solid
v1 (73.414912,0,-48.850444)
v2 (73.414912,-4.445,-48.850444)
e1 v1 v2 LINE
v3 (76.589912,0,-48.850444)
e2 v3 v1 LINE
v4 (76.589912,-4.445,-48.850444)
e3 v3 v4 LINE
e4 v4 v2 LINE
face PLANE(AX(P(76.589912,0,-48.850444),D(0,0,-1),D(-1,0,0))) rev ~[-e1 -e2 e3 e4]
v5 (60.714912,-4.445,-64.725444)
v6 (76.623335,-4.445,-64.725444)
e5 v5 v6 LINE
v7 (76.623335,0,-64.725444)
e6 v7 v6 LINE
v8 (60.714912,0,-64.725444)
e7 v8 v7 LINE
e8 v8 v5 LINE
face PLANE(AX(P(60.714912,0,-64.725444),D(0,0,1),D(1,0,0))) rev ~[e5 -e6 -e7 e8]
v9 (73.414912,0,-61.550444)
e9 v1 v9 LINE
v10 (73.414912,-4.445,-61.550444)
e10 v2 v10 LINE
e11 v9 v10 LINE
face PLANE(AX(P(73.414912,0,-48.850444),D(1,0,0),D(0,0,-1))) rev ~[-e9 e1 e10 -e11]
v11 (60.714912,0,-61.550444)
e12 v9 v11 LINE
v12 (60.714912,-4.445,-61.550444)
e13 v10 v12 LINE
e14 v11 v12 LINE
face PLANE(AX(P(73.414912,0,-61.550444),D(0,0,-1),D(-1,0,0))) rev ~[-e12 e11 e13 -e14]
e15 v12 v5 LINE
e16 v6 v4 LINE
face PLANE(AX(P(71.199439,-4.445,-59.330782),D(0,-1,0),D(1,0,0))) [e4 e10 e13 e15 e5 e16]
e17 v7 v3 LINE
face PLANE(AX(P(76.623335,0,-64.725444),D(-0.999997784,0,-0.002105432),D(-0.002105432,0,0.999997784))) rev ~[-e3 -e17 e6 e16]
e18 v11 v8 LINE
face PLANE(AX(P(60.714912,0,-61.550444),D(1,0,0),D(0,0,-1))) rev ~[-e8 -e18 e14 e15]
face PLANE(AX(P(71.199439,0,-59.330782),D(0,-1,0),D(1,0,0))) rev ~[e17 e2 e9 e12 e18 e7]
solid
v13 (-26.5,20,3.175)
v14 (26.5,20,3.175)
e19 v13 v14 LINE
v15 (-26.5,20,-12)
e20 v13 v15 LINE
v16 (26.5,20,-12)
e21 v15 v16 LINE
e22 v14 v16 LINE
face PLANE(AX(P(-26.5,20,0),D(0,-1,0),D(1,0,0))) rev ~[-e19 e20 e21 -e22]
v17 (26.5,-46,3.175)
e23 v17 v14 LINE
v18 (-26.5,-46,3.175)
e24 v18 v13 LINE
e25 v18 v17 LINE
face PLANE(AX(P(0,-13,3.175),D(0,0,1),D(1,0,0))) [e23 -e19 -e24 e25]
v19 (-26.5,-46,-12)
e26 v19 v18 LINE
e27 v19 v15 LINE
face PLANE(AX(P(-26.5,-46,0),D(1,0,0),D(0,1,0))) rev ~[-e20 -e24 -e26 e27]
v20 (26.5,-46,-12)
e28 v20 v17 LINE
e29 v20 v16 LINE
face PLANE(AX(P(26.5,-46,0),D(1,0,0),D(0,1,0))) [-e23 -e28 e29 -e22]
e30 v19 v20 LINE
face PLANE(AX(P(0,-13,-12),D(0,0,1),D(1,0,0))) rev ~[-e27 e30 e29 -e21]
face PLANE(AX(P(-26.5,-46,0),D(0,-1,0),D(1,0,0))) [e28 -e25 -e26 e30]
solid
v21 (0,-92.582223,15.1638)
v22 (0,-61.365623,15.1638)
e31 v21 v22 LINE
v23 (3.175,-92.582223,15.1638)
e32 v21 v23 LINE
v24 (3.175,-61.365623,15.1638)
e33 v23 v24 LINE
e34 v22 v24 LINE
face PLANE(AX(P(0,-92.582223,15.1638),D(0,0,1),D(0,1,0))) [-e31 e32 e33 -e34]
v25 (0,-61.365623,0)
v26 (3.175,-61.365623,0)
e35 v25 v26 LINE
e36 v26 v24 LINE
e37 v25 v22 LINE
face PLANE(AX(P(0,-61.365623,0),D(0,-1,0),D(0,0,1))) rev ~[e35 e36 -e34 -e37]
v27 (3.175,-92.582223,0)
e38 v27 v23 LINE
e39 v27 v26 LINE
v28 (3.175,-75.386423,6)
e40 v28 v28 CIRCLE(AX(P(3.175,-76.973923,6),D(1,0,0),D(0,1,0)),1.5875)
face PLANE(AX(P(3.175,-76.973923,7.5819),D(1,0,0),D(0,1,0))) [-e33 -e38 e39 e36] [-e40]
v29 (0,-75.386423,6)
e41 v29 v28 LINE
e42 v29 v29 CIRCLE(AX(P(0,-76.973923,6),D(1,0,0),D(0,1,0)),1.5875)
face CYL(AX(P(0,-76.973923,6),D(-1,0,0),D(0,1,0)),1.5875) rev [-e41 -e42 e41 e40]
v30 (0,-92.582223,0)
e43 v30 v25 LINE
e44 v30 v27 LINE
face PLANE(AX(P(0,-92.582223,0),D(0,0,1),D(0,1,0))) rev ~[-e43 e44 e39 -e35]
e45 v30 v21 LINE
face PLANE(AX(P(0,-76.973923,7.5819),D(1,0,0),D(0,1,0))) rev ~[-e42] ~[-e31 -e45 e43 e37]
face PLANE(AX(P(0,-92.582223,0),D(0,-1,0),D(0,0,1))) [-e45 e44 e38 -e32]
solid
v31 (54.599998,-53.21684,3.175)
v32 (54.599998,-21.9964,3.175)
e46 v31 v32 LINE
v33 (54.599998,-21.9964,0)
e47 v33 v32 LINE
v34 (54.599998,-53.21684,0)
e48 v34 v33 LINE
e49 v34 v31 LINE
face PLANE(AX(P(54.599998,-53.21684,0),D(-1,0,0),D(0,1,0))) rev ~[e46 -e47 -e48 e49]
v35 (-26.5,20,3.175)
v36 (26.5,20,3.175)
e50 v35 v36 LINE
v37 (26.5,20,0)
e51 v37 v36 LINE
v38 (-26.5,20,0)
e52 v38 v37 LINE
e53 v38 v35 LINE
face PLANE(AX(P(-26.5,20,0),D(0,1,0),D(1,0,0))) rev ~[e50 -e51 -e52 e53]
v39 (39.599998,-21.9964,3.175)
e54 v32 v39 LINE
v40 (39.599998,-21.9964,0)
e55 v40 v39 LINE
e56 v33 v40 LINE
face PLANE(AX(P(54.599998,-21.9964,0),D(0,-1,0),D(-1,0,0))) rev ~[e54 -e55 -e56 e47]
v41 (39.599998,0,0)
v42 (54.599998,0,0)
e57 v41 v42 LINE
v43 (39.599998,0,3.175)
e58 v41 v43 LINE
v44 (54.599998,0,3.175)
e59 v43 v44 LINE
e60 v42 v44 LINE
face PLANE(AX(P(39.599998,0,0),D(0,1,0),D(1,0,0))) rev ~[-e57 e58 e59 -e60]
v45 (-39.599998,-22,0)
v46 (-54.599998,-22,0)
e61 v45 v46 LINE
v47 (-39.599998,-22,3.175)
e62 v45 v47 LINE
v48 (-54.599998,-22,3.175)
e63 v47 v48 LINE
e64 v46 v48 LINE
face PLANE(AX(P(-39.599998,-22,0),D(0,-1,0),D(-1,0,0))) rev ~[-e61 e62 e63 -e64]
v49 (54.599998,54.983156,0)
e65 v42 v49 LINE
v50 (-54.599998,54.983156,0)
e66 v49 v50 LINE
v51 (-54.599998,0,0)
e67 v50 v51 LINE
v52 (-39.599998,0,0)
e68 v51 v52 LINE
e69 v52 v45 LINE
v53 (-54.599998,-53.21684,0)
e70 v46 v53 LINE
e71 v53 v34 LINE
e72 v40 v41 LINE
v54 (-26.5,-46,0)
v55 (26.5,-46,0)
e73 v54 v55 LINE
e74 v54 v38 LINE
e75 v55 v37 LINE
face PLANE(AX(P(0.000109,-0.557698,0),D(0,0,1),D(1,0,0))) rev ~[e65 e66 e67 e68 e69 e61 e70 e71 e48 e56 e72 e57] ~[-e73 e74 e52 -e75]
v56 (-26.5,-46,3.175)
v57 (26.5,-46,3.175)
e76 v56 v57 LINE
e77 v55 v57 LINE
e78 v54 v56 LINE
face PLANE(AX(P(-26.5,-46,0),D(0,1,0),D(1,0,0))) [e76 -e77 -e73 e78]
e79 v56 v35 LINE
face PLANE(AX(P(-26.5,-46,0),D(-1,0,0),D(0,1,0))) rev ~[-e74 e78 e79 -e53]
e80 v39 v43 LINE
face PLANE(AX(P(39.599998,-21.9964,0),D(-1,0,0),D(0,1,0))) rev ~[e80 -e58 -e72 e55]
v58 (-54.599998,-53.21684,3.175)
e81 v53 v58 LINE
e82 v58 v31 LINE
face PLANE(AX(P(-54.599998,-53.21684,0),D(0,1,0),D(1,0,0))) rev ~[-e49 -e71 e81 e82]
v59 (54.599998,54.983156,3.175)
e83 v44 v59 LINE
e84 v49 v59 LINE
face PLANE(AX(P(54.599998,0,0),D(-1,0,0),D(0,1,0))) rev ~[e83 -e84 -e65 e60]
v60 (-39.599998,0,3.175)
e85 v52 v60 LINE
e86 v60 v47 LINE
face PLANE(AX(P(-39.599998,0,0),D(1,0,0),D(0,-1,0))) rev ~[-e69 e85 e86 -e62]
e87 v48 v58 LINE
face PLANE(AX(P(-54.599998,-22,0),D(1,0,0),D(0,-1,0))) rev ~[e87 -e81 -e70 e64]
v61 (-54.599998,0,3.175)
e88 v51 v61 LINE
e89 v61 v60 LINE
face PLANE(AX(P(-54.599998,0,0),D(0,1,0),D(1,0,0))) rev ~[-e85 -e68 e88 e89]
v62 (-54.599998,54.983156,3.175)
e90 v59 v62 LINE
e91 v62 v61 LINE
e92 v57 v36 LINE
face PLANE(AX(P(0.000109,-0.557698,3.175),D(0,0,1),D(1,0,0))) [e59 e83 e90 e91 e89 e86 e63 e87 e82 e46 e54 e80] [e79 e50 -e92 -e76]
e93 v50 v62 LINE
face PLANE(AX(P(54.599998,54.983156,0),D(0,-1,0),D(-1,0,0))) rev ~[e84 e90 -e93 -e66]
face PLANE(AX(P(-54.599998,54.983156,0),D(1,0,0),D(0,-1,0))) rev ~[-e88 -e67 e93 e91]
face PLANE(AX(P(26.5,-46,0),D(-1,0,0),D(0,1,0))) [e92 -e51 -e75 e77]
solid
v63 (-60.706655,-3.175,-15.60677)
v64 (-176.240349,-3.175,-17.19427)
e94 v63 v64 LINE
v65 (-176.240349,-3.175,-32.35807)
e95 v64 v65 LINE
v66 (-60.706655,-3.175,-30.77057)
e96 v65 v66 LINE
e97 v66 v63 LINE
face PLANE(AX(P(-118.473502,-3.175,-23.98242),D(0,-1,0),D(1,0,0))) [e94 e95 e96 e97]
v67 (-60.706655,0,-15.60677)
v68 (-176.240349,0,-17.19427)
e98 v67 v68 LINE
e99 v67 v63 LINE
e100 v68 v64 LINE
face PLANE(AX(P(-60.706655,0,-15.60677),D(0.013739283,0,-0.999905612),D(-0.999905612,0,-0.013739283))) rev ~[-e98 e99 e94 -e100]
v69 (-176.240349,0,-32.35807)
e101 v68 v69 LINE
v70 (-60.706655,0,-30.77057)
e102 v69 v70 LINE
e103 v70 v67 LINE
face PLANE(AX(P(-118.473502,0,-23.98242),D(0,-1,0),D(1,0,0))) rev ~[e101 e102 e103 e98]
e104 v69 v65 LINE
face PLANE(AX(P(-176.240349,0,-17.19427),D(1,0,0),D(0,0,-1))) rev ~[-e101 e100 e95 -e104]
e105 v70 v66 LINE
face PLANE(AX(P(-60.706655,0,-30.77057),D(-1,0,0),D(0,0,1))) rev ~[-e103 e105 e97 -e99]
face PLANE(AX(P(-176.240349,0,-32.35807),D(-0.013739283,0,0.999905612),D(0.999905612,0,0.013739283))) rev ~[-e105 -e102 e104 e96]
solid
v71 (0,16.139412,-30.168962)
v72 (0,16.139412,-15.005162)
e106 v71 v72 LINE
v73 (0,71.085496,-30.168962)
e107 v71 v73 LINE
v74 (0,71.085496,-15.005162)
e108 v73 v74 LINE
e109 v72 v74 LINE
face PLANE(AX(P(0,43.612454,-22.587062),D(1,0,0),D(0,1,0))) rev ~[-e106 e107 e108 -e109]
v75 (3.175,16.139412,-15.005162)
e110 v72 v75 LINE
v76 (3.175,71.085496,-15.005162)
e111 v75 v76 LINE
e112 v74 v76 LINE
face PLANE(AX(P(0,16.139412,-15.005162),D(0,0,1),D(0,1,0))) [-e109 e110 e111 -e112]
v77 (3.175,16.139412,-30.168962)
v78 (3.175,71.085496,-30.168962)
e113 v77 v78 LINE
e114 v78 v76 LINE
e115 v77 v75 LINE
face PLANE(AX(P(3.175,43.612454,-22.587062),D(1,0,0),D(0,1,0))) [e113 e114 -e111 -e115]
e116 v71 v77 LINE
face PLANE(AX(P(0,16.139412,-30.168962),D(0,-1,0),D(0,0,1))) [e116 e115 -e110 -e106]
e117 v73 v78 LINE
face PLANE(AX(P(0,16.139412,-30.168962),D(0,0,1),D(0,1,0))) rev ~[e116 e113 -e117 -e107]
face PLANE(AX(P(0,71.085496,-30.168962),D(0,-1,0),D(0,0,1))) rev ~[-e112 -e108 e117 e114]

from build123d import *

# Parameters (mm, degrees)
F0_W          = 53
F0_H          = 66
F3_DEPTH      = 3.175
F1_W          = 31.2166
F1_H          = 15.1638
F1_R          = 1.5875
F4_DEPTH      = 3.175
F1_W_2        = 54.9460835755
F5_DEPTH      = 3.175
F6_DEPTH      = 3.175
F7_DEPTH      = 3.175
F7_DEPTH_BACK = 12
F8_DEPTH      = 4.445


# Not quite as in the source:
# - a length typed as a fraction of an inch, garbled in the dataset ("3 / 203.2 mm" for 3/8 in), is restored


with BuildPart() as f3:
    # F0 (on Top) → F3 (new body)
    with BuildSketch(Plane.XY):
        Polygon((-54.5999980115, -22), (-54.5999980115, -53.2168401558), (54.5999980115, -53.2168401558), (54.5999980115, -21.9964), (39.5999980115, -21.9964), (39.5999980115, 0), (54.5999980115, 0), (54.5999980115, 54.9831558671), (-54.5999980115, 54.9831558671), (-54.5999980115, 0), (-39.5999980115, 0), (-39.5999980115, -22), align=None)
        with Locations((0, -13)):
            Rectangle(F0_W, F0_H, mode=Mode.SUBTRACT)
    extrude(amount=F3_DEPTH)


with BuildPart() as f4:
    # F1 (on Right) → F4 (new body)
    with BuildSketch(Plane.YZ):
        with Locations((-76.9739231968, 7.5819)):
            Rectangle(F1_W, F1_H)
        with Locations((-76.9739231968, 6)):
            Circle(F1_R, mode=Mode.SUBTRACT)
    extrude(amount=F4_DEPTH)


with BuildPart() as f5:
    # F1 (on Right) → F5 (new body)
    with BuildSketch(Plane.YZ):
        with Locations((43.6124540865, -22.5870617241)):
            Rectangle(F1_W_2, F1_H)
    extrude(amount=F5_DEPTH)


with BuildPart() as f6:
    # F2 (on Front) → F6 (new body)
    with BuildSketch(Plane.XZ):
        Polygon((-60.7066550265, -15.606769852), (-176.2403489556, -17.194269852), (-176.2403489556, -32.358069852), (-60.7066550265, -30.770569852), align=None)
    extrude(amount=F6_DEPTH)


with BuildPart() as f7:
    # F0 (on Top) → F7 (new body, two sides)
    with BuildSketch(Plane.XY) as f7_sk:
        with Locations((0, -13)):
            Rectangle(F0_W, F0_H)
    extrude(amount=F7_DEPTH)
    extrude(f7_sk.sketch, amount=-F7_DEPTH_BACK)


with BuildPart() as f8:
    # F2 (on Front) → F8 (new body)
    with BuildSketch(Plane.XZ):
        Polygon((76.5899116695, -48.8504437208), (73.4149116695, -48.8504437208), (73.4149116695, -61.5504437208), (60.7149116695, -61.5504437208), (60.7149116695, -64.7254437208), (76.6233354807, -64.7254437208), align=None)
    extrude(amount=F8_DEPTH)


solid = Compound([f3.part, f4.part, f5.part, f6.part, f7.part, f8.part])
